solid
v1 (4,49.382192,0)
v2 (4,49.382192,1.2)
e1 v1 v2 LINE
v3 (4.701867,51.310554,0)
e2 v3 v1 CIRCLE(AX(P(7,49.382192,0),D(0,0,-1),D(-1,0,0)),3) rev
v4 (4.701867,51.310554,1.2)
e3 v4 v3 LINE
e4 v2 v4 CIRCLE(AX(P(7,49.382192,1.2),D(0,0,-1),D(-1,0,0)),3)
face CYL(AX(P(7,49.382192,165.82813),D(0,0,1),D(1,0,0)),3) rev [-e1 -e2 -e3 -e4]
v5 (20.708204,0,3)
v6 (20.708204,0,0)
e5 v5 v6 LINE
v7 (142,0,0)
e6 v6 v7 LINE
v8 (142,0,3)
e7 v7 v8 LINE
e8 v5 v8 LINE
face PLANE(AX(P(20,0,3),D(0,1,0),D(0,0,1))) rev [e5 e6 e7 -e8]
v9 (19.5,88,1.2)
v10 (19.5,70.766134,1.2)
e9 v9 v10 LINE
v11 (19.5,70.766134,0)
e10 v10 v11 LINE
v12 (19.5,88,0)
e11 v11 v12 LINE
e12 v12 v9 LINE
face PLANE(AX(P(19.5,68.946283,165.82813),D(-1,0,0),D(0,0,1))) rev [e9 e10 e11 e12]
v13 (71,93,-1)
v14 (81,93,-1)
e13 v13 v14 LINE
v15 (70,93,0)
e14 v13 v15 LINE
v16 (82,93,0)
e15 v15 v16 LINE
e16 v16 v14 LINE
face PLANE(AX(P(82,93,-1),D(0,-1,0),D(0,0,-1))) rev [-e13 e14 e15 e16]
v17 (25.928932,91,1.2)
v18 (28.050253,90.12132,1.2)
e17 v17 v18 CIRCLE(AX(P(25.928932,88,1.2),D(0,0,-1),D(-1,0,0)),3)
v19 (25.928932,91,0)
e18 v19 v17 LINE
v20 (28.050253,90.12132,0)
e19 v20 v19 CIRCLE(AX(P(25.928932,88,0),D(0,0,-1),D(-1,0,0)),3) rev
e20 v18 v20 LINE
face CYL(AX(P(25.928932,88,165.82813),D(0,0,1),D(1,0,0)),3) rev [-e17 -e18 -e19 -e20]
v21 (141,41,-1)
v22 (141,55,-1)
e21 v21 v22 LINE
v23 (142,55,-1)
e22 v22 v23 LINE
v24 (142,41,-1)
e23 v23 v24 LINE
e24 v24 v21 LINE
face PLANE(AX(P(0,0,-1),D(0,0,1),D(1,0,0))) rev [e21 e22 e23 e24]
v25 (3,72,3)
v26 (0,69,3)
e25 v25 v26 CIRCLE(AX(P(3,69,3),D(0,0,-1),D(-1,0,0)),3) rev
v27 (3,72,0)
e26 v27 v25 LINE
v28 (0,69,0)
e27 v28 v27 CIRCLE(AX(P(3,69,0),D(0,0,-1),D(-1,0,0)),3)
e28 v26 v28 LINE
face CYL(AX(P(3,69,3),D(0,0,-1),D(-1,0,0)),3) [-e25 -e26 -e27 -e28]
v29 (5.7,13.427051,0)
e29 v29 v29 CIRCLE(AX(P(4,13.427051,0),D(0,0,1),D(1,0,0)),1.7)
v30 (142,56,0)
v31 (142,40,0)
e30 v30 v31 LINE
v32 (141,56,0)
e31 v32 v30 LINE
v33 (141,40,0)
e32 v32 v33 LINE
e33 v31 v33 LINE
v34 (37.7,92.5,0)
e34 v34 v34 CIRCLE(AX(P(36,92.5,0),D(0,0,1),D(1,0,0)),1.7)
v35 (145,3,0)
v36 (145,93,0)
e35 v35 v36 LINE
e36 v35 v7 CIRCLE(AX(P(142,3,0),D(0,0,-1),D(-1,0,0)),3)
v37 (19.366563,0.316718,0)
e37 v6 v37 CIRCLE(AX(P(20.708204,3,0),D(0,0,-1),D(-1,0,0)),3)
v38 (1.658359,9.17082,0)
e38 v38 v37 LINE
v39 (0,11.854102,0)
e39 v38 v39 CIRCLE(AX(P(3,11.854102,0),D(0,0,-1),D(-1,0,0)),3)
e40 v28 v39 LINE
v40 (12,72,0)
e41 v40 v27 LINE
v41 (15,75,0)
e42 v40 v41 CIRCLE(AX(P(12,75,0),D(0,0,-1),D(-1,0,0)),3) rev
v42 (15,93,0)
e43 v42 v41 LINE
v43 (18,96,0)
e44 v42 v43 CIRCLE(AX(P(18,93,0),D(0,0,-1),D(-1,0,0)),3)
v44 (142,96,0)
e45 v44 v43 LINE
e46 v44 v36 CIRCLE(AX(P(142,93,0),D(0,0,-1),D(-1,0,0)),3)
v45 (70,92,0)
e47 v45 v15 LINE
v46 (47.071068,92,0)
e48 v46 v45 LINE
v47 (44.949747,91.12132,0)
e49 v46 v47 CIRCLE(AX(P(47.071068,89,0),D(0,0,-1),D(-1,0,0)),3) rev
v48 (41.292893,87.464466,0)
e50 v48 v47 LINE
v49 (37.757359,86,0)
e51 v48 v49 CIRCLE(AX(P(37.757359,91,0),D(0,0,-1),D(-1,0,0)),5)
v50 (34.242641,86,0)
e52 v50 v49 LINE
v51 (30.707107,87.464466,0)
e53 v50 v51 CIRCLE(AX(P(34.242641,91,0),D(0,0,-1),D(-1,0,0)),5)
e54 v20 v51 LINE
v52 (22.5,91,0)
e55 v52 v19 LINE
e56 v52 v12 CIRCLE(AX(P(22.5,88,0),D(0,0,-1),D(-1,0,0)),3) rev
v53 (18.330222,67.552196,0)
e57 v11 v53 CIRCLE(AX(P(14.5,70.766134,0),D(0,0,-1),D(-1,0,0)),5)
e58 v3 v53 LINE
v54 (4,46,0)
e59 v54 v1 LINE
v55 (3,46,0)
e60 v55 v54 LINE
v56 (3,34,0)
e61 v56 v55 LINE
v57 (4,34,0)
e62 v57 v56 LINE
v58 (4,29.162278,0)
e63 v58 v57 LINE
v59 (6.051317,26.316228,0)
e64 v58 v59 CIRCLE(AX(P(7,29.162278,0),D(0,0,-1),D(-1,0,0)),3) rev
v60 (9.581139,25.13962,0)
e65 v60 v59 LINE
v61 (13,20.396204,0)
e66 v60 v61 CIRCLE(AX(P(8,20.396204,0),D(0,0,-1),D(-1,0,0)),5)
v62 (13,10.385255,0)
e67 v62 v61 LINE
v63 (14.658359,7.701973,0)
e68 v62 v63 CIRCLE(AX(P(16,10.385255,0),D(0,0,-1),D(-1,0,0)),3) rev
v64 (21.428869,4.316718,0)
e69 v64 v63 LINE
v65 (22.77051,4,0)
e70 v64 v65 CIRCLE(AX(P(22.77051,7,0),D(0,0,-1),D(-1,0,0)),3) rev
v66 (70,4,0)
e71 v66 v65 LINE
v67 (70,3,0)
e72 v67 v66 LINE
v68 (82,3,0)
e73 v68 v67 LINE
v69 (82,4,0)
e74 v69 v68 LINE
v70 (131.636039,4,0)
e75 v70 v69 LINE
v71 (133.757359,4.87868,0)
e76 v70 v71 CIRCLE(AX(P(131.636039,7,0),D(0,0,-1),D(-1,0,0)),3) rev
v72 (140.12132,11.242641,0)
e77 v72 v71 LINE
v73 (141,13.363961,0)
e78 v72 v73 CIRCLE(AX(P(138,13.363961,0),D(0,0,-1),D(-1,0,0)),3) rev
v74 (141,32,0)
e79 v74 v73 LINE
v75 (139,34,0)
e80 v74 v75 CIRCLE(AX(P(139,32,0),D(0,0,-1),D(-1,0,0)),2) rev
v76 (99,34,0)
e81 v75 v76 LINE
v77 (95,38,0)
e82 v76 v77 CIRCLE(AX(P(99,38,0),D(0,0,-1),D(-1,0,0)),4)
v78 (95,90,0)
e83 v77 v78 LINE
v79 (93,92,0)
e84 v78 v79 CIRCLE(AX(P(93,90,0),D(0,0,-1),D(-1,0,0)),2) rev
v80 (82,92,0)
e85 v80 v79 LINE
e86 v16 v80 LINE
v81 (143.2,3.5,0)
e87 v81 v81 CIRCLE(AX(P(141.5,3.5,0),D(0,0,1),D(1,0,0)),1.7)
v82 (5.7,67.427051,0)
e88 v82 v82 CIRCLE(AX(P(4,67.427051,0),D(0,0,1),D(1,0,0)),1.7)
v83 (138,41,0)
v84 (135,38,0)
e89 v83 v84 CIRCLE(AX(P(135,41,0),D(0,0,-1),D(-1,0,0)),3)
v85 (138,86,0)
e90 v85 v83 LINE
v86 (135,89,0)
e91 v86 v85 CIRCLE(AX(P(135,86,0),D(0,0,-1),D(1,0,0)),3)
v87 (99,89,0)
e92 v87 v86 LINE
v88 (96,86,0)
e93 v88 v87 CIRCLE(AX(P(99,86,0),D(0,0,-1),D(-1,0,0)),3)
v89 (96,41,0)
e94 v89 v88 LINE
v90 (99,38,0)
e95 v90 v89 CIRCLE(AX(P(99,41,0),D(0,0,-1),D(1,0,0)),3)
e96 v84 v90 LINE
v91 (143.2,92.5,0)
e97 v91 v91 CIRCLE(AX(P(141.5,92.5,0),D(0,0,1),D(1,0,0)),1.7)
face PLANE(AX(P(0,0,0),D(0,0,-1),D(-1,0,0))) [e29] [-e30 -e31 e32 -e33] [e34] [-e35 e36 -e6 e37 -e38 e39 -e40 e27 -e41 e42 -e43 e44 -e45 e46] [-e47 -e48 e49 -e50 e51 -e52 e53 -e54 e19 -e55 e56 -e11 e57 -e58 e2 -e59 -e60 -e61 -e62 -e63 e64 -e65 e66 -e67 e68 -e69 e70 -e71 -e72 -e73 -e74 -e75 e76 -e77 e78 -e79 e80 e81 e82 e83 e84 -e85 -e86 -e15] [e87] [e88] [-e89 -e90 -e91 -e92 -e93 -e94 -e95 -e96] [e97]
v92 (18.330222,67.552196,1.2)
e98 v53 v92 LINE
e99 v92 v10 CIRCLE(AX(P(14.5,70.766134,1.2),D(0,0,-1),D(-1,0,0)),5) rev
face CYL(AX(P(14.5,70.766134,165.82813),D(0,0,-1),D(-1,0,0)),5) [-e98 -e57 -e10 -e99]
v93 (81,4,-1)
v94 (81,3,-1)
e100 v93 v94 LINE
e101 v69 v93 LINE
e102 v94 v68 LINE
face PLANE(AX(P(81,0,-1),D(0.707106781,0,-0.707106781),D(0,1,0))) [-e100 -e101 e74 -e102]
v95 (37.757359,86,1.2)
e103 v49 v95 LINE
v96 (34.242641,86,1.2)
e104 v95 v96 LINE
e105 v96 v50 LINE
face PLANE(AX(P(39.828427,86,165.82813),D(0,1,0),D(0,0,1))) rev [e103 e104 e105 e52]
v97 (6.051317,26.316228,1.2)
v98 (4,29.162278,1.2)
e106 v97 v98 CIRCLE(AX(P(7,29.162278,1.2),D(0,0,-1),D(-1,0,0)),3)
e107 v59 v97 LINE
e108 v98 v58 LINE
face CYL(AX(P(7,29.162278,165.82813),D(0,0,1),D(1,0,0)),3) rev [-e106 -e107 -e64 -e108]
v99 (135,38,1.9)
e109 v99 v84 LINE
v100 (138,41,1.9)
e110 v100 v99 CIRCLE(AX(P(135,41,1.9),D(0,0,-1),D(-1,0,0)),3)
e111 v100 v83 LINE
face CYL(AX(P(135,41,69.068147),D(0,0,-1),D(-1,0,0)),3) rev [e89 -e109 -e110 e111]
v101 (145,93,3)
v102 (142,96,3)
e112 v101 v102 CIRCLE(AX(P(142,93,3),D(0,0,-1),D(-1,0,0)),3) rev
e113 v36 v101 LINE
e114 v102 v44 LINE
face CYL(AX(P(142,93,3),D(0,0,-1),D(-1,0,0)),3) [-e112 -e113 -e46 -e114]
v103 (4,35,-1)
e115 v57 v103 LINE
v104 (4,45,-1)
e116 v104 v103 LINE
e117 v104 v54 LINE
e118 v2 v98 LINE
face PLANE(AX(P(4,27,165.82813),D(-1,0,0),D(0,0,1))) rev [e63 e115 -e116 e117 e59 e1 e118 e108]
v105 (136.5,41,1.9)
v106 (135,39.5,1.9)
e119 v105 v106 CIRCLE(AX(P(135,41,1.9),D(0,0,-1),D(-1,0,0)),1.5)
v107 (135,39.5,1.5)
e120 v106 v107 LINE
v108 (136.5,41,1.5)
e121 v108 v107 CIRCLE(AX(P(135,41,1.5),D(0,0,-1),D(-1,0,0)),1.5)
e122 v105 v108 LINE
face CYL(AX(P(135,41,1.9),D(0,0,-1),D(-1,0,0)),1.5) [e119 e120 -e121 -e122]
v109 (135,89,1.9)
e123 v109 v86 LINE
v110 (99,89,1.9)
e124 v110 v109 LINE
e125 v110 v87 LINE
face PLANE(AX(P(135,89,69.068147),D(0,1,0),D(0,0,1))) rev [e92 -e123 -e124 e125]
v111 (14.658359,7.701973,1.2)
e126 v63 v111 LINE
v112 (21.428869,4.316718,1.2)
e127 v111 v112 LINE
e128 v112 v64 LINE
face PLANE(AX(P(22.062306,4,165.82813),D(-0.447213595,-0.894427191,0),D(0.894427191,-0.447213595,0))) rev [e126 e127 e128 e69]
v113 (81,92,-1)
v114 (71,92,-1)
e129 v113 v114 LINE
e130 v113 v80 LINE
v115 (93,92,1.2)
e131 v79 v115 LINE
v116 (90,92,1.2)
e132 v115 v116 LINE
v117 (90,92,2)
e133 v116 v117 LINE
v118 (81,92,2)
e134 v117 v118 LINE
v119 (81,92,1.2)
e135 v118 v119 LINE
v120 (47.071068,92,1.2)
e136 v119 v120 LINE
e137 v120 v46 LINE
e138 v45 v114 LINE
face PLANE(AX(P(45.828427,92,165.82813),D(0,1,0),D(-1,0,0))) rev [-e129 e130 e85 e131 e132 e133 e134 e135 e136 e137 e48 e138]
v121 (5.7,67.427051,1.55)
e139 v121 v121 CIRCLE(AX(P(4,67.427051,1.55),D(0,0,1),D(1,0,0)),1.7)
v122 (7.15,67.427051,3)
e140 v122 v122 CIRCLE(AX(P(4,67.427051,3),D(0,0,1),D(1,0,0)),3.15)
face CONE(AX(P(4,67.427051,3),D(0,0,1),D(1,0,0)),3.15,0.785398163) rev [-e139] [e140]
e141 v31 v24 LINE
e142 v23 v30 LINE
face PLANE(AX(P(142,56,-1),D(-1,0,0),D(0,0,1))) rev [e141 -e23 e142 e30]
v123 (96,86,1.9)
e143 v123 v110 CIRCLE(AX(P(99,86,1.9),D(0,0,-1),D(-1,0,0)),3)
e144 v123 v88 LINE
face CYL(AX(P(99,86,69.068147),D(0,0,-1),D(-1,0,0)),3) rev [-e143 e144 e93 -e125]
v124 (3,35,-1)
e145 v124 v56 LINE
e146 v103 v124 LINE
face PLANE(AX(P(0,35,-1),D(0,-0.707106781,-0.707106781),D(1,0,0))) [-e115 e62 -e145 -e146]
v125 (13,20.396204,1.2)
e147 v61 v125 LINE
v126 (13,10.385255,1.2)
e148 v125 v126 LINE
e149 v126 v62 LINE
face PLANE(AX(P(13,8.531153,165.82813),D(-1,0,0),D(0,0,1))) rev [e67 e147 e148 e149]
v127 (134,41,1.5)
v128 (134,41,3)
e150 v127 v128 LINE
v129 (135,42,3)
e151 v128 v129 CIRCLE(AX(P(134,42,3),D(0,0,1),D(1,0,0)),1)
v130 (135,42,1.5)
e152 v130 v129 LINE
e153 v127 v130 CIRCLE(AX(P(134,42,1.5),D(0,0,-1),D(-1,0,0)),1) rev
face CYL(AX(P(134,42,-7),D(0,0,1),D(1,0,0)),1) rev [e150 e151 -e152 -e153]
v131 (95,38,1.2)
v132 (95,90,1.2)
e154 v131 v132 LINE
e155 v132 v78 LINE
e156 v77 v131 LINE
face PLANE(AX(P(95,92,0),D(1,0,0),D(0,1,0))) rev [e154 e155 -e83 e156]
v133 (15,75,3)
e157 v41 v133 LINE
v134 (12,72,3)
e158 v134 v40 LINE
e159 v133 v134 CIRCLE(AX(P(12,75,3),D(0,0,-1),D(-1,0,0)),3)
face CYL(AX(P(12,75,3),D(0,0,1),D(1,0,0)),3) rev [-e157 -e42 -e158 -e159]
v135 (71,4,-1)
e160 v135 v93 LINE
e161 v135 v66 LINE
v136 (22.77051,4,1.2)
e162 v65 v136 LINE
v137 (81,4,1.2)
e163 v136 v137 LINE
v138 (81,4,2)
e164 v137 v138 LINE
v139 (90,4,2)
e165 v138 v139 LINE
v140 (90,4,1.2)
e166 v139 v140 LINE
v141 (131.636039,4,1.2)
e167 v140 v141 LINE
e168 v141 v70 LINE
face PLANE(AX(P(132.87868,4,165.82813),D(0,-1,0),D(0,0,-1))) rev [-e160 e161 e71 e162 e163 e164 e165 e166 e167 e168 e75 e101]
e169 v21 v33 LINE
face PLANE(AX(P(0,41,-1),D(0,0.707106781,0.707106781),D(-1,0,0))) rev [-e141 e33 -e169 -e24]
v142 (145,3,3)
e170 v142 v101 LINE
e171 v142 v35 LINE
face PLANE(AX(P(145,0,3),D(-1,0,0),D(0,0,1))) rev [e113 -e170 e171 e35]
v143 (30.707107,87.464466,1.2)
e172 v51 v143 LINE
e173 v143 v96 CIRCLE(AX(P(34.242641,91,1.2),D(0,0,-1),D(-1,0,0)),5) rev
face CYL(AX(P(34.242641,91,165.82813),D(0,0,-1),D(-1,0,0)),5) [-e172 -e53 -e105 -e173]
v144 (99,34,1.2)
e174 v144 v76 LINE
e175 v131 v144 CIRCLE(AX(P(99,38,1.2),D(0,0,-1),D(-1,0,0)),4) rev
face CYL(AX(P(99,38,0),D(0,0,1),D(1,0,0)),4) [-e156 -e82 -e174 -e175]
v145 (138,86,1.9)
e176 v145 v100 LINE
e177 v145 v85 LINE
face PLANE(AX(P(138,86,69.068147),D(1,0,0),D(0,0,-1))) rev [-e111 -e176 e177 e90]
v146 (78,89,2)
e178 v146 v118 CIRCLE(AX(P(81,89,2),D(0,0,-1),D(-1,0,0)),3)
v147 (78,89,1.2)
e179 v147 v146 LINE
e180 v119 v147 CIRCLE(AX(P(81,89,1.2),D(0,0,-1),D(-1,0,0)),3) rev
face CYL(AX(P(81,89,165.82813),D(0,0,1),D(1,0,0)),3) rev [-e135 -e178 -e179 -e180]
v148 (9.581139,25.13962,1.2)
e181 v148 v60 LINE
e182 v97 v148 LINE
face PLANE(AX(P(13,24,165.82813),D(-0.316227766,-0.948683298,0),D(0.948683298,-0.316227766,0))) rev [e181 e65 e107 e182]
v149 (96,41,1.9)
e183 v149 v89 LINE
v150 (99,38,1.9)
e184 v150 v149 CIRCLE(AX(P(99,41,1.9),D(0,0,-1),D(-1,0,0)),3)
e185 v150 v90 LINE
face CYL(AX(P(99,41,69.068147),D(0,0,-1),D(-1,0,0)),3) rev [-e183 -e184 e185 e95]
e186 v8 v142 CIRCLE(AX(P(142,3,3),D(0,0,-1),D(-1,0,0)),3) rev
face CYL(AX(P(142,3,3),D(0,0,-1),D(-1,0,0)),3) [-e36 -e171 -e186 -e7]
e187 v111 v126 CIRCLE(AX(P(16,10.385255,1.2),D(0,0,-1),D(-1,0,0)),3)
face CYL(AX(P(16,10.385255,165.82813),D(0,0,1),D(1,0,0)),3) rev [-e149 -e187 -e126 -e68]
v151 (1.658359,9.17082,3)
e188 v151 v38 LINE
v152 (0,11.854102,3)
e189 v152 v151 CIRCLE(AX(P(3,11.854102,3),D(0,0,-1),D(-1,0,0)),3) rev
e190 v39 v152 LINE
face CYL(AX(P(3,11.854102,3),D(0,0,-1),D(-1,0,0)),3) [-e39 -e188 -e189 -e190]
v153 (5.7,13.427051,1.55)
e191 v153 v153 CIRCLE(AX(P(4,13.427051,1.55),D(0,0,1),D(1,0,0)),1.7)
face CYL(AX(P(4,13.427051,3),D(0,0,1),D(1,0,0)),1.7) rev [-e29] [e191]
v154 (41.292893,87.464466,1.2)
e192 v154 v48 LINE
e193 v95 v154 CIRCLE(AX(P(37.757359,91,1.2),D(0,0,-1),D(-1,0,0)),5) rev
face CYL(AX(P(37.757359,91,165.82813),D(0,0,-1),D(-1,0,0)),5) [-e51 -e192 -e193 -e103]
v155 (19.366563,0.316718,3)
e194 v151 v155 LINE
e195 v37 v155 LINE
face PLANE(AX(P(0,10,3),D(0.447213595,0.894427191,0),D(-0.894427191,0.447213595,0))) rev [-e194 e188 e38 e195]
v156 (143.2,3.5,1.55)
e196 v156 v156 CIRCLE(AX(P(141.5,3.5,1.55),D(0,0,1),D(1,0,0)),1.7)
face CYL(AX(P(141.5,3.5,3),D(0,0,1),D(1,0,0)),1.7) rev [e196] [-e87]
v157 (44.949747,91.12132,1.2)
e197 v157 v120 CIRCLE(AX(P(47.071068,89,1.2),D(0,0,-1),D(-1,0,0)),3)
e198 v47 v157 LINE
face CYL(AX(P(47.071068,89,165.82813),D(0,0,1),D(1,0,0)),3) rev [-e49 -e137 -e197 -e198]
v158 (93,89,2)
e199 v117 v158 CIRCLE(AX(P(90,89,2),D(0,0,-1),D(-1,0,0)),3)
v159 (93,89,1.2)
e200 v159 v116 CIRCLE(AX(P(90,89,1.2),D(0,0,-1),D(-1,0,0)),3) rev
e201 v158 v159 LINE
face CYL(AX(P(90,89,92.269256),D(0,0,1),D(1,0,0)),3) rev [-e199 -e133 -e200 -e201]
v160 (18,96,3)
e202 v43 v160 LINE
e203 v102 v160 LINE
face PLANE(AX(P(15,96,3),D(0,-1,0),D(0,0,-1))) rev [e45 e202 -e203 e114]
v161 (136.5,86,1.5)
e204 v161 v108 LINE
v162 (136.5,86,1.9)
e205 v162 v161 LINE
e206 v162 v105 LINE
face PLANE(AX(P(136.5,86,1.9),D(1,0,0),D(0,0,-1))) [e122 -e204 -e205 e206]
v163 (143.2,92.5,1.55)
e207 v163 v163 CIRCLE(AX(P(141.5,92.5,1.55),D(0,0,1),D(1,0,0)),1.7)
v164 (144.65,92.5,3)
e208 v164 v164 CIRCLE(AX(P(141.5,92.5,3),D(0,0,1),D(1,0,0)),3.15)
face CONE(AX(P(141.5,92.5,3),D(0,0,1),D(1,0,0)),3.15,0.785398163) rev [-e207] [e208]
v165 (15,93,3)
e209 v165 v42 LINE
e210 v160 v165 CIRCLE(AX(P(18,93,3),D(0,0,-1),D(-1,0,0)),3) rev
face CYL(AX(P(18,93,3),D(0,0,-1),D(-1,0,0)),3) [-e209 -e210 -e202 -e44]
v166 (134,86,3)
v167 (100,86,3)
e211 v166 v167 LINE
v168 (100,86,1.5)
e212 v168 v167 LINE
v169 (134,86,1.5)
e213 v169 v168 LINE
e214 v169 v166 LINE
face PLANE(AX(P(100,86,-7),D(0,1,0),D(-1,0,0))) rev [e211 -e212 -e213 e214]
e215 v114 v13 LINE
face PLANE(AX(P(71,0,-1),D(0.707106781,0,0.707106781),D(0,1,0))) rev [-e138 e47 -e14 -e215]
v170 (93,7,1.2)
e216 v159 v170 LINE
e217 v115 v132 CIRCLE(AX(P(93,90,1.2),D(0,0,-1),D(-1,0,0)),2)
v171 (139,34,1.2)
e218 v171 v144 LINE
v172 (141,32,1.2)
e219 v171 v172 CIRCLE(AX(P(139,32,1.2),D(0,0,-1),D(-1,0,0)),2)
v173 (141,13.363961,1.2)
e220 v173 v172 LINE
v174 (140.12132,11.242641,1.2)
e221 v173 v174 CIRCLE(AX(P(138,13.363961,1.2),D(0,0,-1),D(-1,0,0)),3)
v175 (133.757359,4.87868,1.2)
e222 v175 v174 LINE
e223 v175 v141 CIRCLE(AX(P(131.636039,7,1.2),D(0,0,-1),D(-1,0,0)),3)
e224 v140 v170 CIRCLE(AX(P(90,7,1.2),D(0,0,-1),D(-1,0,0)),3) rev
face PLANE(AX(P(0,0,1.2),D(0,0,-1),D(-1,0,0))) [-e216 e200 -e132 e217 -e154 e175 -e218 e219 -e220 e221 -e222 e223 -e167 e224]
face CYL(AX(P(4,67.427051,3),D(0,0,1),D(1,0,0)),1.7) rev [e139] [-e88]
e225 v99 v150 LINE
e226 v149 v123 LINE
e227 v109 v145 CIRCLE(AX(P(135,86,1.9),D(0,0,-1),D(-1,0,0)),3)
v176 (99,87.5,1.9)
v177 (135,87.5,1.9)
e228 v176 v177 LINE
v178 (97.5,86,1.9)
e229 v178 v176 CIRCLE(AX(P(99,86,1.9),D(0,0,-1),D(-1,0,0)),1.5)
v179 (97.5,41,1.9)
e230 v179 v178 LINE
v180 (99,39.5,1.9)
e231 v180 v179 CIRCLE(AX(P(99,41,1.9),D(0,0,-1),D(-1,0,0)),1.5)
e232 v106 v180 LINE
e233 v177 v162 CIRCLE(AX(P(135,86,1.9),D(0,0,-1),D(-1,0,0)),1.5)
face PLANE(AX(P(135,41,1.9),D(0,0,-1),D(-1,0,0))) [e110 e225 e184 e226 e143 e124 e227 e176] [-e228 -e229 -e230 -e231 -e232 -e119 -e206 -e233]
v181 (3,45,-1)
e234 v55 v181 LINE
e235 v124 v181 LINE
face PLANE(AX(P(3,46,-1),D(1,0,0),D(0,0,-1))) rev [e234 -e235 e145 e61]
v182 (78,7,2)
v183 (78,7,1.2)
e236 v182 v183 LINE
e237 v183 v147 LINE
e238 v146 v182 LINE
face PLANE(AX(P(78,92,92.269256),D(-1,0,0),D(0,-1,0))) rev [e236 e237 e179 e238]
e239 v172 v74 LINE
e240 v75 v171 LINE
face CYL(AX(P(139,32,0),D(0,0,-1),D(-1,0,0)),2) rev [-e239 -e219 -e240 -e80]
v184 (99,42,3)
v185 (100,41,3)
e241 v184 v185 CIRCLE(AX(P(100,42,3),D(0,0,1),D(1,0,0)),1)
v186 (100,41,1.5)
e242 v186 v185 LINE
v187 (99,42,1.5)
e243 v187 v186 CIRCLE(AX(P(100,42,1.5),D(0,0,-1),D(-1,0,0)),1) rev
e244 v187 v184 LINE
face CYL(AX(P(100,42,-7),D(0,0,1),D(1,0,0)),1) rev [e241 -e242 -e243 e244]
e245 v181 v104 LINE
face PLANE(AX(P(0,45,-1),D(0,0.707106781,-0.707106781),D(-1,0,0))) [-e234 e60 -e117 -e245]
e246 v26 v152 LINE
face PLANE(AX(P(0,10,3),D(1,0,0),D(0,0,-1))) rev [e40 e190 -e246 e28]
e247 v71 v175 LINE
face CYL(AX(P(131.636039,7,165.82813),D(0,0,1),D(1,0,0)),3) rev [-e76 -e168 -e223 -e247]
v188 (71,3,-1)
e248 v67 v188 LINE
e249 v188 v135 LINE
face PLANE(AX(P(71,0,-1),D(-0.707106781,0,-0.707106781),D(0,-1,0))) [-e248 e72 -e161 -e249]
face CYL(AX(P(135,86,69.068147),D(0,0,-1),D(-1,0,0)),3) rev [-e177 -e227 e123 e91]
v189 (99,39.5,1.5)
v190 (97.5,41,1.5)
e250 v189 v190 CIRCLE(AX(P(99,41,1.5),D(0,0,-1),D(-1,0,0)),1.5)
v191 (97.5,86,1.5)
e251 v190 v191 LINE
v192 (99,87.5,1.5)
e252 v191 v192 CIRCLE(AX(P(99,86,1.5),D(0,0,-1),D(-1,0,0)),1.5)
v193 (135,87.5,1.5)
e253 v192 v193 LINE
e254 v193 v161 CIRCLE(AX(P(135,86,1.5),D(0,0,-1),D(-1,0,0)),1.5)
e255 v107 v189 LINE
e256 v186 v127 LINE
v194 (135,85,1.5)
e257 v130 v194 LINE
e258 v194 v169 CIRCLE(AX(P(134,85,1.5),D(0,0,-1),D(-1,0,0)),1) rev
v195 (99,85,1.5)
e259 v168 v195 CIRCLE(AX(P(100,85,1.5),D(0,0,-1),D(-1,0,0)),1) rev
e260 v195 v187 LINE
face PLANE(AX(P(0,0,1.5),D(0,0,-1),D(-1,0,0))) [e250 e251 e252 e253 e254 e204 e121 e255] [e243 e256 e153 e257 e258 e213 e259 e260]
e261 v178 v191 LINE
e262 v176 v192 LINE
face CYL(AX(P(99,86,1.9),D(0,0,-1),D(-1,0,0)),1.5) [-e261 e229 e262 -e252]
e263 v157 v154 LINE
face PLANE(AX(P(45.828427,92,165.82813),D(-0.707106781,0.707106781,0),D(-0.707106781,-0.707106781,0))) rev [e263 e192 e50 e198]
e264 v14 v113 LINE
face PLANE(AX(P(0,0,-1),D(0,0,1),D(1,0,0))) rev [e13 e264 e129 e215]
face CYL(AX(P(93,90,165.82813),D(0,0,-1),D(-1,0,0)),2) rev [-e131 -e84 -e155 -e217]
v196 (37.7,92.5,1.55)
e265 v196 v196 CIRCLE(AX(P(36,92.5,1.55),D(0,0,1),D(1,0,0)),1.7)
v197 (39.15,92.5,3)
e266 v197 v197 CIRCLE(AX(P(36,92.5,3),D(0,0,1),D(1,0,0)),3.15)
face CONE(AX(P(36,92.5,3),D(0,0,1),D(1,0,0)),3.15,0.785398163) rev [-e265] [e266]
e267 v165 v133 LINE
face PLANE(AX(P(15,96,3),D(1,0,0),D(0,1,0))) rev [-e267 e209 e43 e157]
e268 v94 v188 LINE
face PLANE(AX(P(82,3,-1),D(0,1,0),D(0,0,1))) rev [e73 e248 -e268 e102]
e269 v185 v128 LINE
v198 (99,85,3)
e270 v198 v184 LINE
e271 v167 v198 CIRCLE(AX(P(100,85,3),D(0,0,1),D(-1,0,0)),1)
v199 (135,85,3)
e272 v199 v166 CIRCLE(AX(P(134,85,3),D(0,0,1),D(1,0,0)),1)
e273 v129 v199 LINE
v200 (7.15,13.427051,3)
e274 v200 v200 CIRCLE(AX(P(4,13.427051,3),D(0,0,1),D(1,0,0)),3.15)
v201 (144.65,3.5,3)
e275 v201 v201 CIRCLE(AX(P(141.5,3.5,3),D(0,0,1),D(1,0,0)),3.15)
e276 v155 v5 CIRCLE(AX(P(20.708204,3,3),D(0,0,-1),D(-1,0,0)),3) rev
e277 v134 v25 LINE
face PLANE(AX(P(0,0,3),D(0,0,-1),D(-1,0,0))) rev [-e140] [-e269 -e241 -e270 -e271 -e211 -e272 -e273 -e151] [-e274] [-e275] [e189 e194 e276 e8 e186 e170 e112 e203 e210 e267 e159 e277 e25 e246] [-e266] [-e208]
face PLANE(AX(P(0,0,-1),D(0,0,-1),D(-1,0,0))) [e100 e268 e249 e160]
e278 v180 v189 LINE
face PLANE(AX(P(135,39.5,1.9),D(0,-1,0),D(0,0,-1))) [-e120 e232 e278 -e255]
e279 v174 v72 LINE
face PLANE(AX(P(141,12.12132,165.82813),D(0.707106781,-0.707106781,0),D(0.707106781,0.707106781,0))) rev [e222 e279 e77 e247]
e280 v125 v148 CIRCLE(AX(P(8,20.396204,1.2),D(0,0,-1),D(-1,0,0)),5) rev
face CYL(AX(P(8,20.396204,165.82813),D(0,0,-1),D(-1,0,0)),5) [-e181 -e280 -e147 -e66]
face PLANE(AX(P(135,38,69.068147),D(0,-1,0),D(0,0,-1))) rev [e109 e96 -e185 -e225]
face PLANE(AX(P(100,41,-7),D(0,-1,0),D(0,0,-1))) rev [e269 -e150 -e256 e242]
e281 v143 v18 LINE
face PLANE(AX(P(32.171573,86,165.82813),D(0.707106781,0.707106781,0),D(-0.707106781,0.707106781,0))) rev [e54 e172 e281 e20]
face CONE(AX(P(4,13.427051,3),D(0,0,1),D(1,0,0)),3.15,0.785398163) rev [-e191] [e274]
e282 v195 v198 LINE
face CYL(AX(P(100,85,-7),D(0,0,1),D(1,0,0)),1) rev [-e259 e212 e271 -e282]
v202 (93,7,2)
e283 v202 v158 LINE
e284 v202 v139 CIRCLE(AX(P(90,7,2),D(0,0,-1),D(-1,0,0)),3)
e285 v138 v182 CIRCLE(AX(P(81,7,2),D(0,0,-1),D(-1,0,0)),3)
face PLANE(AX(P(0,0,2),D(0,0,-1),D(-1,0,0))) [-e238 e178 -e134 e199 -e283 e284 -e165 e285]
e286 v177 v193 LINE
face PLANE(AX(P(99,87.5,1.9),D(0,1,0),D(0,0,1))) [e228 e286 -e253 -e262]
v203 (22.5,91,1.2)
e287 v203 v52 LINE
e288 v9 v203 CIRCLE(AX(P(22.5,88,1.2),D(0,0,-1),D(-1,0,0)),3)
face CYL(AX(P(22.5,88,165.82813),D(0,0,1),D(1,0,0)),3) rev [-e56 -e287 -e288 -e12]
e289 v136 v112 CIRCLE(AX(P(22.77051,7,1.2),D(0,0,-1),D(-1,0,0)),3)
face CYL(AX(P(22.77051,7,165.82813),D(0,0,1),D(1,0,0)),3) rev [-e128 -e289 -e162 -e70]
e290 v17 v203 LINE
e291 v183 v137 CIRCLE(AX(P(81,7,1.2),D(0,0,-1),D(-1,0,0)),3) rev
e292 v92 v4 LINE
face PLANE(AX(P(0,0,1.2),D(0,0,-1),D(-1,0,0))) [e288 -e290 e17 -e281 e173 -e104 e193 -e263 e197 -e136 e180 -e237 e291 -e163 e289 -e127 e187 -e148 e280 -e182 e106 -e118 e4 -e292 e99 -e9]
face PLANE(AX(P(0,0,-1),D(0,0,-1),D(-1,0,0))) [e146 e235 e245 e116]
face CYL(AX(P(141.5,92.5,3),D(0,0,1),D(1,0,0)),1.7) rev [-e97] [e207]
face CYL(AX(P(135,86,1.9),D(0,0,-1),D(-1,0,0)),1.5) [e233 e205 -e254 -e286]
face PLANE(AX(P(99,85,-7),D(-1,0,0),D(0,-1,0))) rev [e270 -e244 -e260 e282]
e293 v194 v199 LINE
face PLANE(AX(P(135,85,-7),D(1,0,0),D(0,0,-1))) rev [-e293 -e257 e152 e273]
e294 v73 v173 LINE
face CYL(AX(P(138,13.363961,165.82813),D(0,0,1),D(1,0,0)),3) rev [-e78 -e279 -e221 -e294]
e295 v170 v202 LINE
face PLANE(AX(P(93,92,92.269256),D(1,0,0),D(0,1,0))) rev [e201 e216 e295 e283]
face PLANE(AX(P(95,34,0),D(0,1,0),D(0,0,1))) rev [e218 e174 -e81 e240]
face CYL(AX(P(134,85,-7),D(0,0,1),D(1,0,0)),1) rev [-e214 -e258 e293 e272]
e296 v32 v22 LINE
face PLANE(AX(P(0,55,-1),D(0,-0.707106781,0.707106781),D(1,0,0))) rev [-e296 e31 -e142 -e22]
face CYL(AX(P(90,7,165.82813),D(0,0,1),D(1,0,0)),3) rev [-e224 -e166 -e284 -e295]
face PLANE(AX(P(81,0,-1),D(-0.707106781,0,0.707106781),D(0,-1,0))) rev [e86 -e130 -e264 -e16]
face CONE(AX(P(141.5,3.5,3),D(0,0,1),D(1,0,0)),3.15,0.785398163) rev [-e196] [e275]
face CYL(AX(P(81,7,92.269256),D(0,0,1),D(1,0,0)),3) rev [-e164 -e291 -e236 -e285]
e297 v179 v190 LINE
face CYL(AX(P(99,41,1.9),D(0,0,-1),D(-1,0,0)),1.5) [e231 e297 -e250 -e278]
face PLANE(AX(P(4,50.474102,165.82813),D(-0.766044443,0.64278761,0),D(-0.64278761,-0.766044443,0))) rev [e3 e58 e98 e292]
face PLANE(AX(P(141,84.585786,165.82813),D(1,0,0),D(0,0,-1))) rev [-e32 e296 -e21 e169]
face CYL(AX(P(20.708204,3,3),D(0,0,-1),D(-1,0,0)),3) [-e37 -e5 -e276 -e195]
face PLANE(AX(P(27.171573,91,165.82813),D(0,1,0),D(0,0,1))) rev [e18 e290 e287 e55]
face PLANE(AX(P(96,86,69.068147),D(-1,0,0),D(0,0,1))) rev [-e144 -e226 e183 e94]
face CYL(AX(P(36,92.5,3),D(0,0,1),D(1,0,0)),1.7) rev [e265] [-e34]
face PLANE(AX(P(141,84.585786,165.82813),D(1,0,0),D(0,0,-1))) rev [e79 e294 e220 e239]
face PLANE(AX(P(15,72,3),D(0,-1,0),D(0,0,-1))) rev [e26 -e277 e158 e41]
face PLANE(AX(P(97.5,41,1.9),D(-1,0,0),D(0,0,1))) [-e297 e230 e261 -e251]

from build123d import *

# Parameters (mm, degrees)
EXTRUDE_1_DEPTH             = 3
HOLE_WIZARD_M3_1_AT_2_COUNT = 2
HOLE_WIZARD_M3_1_AT_2_PITCH = 89
HOLE_WIZARD_M3_1_AT_3_COUNT = 2
HOLE_WIZARD_M3_1_AT_3_PITCH = 139.767316539
HOLE_WIZARD_M3_1_AT_4_COUNT = 2
HOLE_WIZARD_M3_1_AT_4_PITCH = 158.615198724
HOLE_WIZARD_M3_1_AT_5_COUNT = 2
HOLE_WIZARD_M3_1_AT_5_PITCH = 105.5
FILLET_1_R                  = 3
FILLET_2_R                  = 3
CUT_EXTRUDE_1_DEPTH         = 1.2
SKETCH_5_W                  = 15
SKETCH_5_H                  = 88
CUT_EXTRUDE_2_DEPTH         = 0.8
FILLET_5_R                  = 3
FILLET_6_R                  = 5
FILLET_7_R                  = 3
SKETCH_6_W                  = 1
SKETCH_6_H                  = 16
SKETCH_6_H_2                = 12
SKETCH_6_W_2                = 12
SKETCH_6_H_3                = 1
EXTRUDE_2_DEPTH             = 1
FILLET_8_R                  = 3
CHAMFER_1_SIZE              = 1
EXTRUDE_4_DEPTH             = 1.2
CUT_EXTRUDE_3_DEPTH         = 10
CUT_EXTRUDE_5_DEPTH         = 1.5
CUT_EXTRUDE_6_DEPTH         = 0.4
FILLET_9_R                  = 2
FILLET_10_R                 = 4


with BuildPart() as part:
    # 草图1 → 凸台-拉伸1 (new body)
    with BuildSketch(Plane.XY):
        Polygon((15, 96), (15, 72), (0, 72), (0, 10), (20, 0), (145, 0), (145, 96), align=None)
    extrude(amount=EXTRUDE_1_DEPTH)

    # 草图2 → M3 平头机械螺钉的锥形沉头孔1 (revolve, cut)
    with BuildSketch(Plane(origin=(141.5, 92.5, 3), x_dir=(0, -1, 0), z_dir=(1, 0, 0))):
        Polygon((0, 0), (0, 3), (1.7, 3), (1.7, 1.45), (3.15, 0), align=None)
    hole_wizard_m3_1 = revolve(axis=Axis((141.5, 92.5, 9.35), (0, 0, -1)), mode=Mode.SUBTRACT)

    # M3 平头机械螺钉的锥形沉头孔1 at 2: M3 平头机械螺钉的锥形沉头孔1 ×2
    with Locations(*[(0, -i * HOLE_WIZARD_M3_1_AT_2_PITCH, 0) for i in range(1, HOLE_WIZARD_M3_1_AT_2_COUNT)]):
        add(hole_wizard_m3_1, mode=Mode.SUBTRACT)

    # M3 平头机械螺钉的锥形沉头孔1 at 3: M3 平头机械螺钉的锥形沉头孔1 ×2
    with Locations(*[Vector(-0.9837779203696774, -0.1793906446644101, 0) * (i * HOLE_WIZARD_M3_1_AT_3_PITCH) for i in range(1, HOLE_WIZARD_M3_1_AT_3_COUNT)]):
        add(hole_wizard_m3_1, mode=Mode.SUBTRACT)

    # M3 平头机械螺钉的锥形沉头孔1 at 4: M3 平头机械螺钉的锥形沉头孔1 ×2
    with Locations(*[Vector(-0.8668778345720617, -0.4985206313961874, 0) * (i * HOLE_WIZARD_M3_1_AT_4_PITCH) for i in range(1, HOLE_WIZARD_M3_1_AT_4_COUNT)]):
        add(hole_wizard_m3_1, mode=Mode.SUBTRACT)

    # M3 平头机械螺钉的锥形沉头孔1 at 5: M3 平头机械螺钉的锥形沉头孔1 ×2
    with Locations(*[(-i * HOLE_WIZARD_M3_1_AT_5_PITCH, 0, 0) for i in range(1, HOLE_WIZARD_M3_1_AT_5_COUNT)]):
        add(hole_wizard_m3_1, mode=Mode.SUBTRACT)

    # 圆角1
    fillet_1_edges = [part.edges().sort_by_distance(p)[0] for p in [
        (145, 0, 1.5),
        (145, 96, 1.5),
    ]]
    fillet(fillet_1_edges, radius=FILLET_1_R)

    # 圆角2
    fillet_2_edges = [part.edges().sort_by_distance(p)[0] for p in [
        (20, 0, 1.5),
        (0, 10, 1.5),
        (0, 72, 1.5),
        (15, 96, 1.5),
    ]]
    fillet(fillet_2_edges, radius=FILLET_2_R)

    # 草图4 → 切除-拉伸1 (cut)
    with BuildSketch(Plane(origin=(0, 0, 0), x_dir=(-1, 0, 0), z_dir=(0, 0, -1))):
        Polygon((-133.585786438, 92), (-141, 84.585786438), (-141, 12.121320344), (-132.878679656, 4), (-22.062305899, 4), (-13, 8.531152949), (-13, 24), (-4, 27), (-4, 50.47410222), (-19.5, 68.946282906), (-19.5, 91), (-27.171572875, 91), (-32.171572875, 86), (-39.828427125, 86), (-45.828427125, 92), align=None)
    extrude(amount=-CUT_EXTRUDE_1_DEPTH, mode=Mode.SUBTRACT)

    # 草图5 → 切除-拉伸2 (cut)
    with BuildSketch(Plane(origin=(0, 0, 1.2), x_dir=(-1, 0, 0), z_dir=(0, 0, -1))):
        with Locations((-85.5, 48)):
            Rectangle(SKETCH_5_W, SKETCH_5_H)
    extrude(amount=-CUT_EXTRUDE_2_DEPTH, mode=Mode.SUBTRACT)

    # 圆角5
    fillet_5_edges = [part.edges().sort_by_distance(p)[0] for p in [
        (13, 8.531152949, 0.6),
        (22.062305899, 4, 0.6),
        (132.878679656, 4, 0.6),
        (141, 12.121320344, 0.6),
        (141, 84.585786438, 0.6),
        (133.585786438, 92, 0.6),
        (4, 50.47410222, 0.6),
        (4, 27, 0.6),
        (45.828427125, 92, 0.6),
        (27.171572875, 91, 0.6),
        (19.5, 91, 0.6),
    ]]
    fillet(fillet_5_edges, radius=FILLET_5_R)

    # 圆角6
    fillet_6_edges = [part.edges().sort_by_distance(p)[0] for p in [
        (39.828427125, 86, 0.6),
        (32.171572875, 86, 0.6),
        (19.5, 68.946282906, 0.6),
        (13, 24, 0.6),
    ]]
    fillet(fillet_6_edges, radius=FILLET_6_R)

    # 圆角7
    fillet_7_edges = [part.edges().sort_by_distance(p)[0] for p in [
        (78, 4, 1.6),
        (93, 4, 1.6),
        (78, 92, 1.6),
        (93, 92, 1.6),
    ]]
    fillet(fillet_7_edges, radius=FILLET_7_R)

    # 草图6 → 凸台-拉伸2 (add)
    with BuildSketch(Plane(origin=(0, 0, 0), x_dir=(-1, 0, 0), z_dir=(0, 0, -1))):
        with Locations((-141.5, 48)):
            Rectangle(SKETCH_6_W, SKETCH_6_H)
        with Locations((-3.5, 40)):
            Rectangle(SKETCH_6_W, SKETCH_6_H_2)
        with Locations((-76, 3.5)):
            Rectangle(SKETCH_6_W_2, SKETCH_6_H_3)
        with Locations((-76, 92.5)):
            Rectangle(SKETCH_6_W_2, SKETCH_6_H_3)
    extrude(amount=EXTRUDE_2_DEPTH)

    # 圆角8
    fillet_8_edges = [part.edges().sort_by_distance(p)[0] for p in [
        (15, 72, 1.5),
    ]]
    fillet(fillet_8_edges, radius=FILLET_8_R)

    # 倒角1
    chamfer_1_edges = [part.edges().sort_by_distance(p)[0] for p in [
        (3.5, 46, -1),
        (3.5, 34, -1),
        (70, 3.5, -1),
        (82, 3.5, -1),
        (141.5, 56, -1),
        (141.5, 40, -1),
        (82, 92.5, -1),
        (70, 92.5, -1),
    ]]
    chamfer(chamfer_1_edges, length=CHAMFER_1_SIZE - 0.0001)  # a hair under: the kernel refuses the full size

    # 草图9 → 凸台-拉伸4 (add)
    with BuildSketch(Plane(origin=(0, 0, 1.2), x_dir=(-1, 0, 0), z_dir=(0, 0, -1))):
        with BuildLine():
            Line((-95, 92), (-95, 34))
            Line((-95, 34), (-141, 34))
            Line((-141, 34), (-141, 83.343145751))
            ThreePointArc((-141, 83.343145751), (-140.771638598, 84.491196048), (-140.121320344, 85.464466094))
            Line((-140.121320344, 85.464466094), (-134.464466094, 91.121320344))
            ThreePointArc((-134.464466094, 91.121320344), (-133.491196048, 91.771638598), (-132.343145751, 92))
            Line((-132.343145751, 92), (-95, 92))
        make_face()
    extrude(amount=EXTRUDE_4_DEPTH)

    # 草图7 → 切除-拉伸3 (cut)
    with BuildSketch(Plane.XY.offset(3)):
        with BuildLine():
            Line((100, 86), (134, 86))
            ThreePointArc((134, 86), (134.707106781, 85.707106781), (135, 85))
            Line((135, 85), (135, 42))
            ThreePointArc((135, 42), (134.707106781, 41.292893219), (134, 41))
            Line((134, 41), (100, 41))
            ThreePointArc((100, 41), (99.292893219, 41.292893219), (99, 42))
            Line((99, 42), (99, 85))
            ThreePointArc((99, 85), (99.292893219, 85.707106781), (100, 86))
        make_face()
    extrude(amount=-CUT_EXTRUDE_3_DEPTH, mode=Mode.SUBTRACT)

    # 草图10 → 切除-拉伸5 (cut)
    with BuildSketch(Plane(origin=(0, 0, 0), x_dir=(-1, 0, 0), z_dir=(0, 0, -1))):
        with BuildLine():
            Line((-135, 89), (-99, 89))
            ThreePointArc((-99, 89), (-96.878679656, 88.121320344), (-96, 86))
            Line((-96, 86), (-96, 41))
            ThreePointArc((-96, 41), (-96.878679656, 38.878679656), (-99, 38))
            Line((-99, 38), (-135, 38))
            ThreePointArc((-135, 38), (-137.121320344, 38.878679656), (-138, 41))
            Line((-138, 41), (-138, 86))
            ThreePointArc((-138, 86), (-137.121320344, 88.121320344), (-135, 89))
        make_face()
    extrude(amount=-CUT_EXTRUDE_5_DEPTH, mode=Mode.SUBTRACT)

    # 草图12 → 切除-拉伸6 (cut)
    with BuildSketch(Plane(origin=(0, 0, 1.5), x_dir=(-1, 0, 0), z_dir=(0, 0, -1))):
        with BuildLine():
            Line((-135, 38), (-99, 38))
            ThreePointArc((-99, 38), (-96.878679656, 38.878679656), (-96, 41))
            Line((-96, 41), (-96, 86))
            ThreePointArc((-96, 86), (-96.878679656, 88.121320344), (-99, 89))
            Line((-99, 89), (-135, 89))
            ThreePointArc((-135, 89), (-137.121320344, 88.121320344), (-138, 86))
            Line((-138, 86), (-138, 41))
            ThreePointArc((-138, 41), (-137.121320344, 38.878679656), (-135, 38))
        make_face()
        with BuildLine():
            Line((-135, 39.5), (-99, 39.5))
            ThreePointArc((-99, 39.5), (-97.939339828, 39.939339828), (-97.5, 41))
            Line((-97.5, 41), (-97.5, 86))
            ThreePointArc((-97.5, 86), (-97.939339828, 87.060660172), (-99, 87.5))
            Line((-99, 87.5), (-135, 87.5))
            ThreePointArc((-135, 87.5), (-136.060660172, 87.060660172), (-136.5, 86))
            Line((-136.5, 86), (-136.5, 41))
            ThreePointArc((-136.5, 41), (-136.060660172, 39.939339828), (-135, 39.5))
        make_face(mode=Mode.SUBTRACT)
    extrude(amount=-CUT_EXTRUDE_6_DEPTH, mode=Mode.SUBTRACT)

    # 圆角9
    fillet_9_edges = [part.edges().sort_by_distance(p)[0] for p in [
        (141, 34, 0.6),
        (95, 92, 0.6),
    ]]
    fillet(fillet_9_edges, radius=FILLET_9_R)

    # 圆角10
    fillet_10_edges = [part.edges().sort_by_distance(p)[0] for p in [
        (95, 34, 0.6),
    ]]
    fillet(fillet_10_edges, radius=FILLET_10_R)


solid = part.part
